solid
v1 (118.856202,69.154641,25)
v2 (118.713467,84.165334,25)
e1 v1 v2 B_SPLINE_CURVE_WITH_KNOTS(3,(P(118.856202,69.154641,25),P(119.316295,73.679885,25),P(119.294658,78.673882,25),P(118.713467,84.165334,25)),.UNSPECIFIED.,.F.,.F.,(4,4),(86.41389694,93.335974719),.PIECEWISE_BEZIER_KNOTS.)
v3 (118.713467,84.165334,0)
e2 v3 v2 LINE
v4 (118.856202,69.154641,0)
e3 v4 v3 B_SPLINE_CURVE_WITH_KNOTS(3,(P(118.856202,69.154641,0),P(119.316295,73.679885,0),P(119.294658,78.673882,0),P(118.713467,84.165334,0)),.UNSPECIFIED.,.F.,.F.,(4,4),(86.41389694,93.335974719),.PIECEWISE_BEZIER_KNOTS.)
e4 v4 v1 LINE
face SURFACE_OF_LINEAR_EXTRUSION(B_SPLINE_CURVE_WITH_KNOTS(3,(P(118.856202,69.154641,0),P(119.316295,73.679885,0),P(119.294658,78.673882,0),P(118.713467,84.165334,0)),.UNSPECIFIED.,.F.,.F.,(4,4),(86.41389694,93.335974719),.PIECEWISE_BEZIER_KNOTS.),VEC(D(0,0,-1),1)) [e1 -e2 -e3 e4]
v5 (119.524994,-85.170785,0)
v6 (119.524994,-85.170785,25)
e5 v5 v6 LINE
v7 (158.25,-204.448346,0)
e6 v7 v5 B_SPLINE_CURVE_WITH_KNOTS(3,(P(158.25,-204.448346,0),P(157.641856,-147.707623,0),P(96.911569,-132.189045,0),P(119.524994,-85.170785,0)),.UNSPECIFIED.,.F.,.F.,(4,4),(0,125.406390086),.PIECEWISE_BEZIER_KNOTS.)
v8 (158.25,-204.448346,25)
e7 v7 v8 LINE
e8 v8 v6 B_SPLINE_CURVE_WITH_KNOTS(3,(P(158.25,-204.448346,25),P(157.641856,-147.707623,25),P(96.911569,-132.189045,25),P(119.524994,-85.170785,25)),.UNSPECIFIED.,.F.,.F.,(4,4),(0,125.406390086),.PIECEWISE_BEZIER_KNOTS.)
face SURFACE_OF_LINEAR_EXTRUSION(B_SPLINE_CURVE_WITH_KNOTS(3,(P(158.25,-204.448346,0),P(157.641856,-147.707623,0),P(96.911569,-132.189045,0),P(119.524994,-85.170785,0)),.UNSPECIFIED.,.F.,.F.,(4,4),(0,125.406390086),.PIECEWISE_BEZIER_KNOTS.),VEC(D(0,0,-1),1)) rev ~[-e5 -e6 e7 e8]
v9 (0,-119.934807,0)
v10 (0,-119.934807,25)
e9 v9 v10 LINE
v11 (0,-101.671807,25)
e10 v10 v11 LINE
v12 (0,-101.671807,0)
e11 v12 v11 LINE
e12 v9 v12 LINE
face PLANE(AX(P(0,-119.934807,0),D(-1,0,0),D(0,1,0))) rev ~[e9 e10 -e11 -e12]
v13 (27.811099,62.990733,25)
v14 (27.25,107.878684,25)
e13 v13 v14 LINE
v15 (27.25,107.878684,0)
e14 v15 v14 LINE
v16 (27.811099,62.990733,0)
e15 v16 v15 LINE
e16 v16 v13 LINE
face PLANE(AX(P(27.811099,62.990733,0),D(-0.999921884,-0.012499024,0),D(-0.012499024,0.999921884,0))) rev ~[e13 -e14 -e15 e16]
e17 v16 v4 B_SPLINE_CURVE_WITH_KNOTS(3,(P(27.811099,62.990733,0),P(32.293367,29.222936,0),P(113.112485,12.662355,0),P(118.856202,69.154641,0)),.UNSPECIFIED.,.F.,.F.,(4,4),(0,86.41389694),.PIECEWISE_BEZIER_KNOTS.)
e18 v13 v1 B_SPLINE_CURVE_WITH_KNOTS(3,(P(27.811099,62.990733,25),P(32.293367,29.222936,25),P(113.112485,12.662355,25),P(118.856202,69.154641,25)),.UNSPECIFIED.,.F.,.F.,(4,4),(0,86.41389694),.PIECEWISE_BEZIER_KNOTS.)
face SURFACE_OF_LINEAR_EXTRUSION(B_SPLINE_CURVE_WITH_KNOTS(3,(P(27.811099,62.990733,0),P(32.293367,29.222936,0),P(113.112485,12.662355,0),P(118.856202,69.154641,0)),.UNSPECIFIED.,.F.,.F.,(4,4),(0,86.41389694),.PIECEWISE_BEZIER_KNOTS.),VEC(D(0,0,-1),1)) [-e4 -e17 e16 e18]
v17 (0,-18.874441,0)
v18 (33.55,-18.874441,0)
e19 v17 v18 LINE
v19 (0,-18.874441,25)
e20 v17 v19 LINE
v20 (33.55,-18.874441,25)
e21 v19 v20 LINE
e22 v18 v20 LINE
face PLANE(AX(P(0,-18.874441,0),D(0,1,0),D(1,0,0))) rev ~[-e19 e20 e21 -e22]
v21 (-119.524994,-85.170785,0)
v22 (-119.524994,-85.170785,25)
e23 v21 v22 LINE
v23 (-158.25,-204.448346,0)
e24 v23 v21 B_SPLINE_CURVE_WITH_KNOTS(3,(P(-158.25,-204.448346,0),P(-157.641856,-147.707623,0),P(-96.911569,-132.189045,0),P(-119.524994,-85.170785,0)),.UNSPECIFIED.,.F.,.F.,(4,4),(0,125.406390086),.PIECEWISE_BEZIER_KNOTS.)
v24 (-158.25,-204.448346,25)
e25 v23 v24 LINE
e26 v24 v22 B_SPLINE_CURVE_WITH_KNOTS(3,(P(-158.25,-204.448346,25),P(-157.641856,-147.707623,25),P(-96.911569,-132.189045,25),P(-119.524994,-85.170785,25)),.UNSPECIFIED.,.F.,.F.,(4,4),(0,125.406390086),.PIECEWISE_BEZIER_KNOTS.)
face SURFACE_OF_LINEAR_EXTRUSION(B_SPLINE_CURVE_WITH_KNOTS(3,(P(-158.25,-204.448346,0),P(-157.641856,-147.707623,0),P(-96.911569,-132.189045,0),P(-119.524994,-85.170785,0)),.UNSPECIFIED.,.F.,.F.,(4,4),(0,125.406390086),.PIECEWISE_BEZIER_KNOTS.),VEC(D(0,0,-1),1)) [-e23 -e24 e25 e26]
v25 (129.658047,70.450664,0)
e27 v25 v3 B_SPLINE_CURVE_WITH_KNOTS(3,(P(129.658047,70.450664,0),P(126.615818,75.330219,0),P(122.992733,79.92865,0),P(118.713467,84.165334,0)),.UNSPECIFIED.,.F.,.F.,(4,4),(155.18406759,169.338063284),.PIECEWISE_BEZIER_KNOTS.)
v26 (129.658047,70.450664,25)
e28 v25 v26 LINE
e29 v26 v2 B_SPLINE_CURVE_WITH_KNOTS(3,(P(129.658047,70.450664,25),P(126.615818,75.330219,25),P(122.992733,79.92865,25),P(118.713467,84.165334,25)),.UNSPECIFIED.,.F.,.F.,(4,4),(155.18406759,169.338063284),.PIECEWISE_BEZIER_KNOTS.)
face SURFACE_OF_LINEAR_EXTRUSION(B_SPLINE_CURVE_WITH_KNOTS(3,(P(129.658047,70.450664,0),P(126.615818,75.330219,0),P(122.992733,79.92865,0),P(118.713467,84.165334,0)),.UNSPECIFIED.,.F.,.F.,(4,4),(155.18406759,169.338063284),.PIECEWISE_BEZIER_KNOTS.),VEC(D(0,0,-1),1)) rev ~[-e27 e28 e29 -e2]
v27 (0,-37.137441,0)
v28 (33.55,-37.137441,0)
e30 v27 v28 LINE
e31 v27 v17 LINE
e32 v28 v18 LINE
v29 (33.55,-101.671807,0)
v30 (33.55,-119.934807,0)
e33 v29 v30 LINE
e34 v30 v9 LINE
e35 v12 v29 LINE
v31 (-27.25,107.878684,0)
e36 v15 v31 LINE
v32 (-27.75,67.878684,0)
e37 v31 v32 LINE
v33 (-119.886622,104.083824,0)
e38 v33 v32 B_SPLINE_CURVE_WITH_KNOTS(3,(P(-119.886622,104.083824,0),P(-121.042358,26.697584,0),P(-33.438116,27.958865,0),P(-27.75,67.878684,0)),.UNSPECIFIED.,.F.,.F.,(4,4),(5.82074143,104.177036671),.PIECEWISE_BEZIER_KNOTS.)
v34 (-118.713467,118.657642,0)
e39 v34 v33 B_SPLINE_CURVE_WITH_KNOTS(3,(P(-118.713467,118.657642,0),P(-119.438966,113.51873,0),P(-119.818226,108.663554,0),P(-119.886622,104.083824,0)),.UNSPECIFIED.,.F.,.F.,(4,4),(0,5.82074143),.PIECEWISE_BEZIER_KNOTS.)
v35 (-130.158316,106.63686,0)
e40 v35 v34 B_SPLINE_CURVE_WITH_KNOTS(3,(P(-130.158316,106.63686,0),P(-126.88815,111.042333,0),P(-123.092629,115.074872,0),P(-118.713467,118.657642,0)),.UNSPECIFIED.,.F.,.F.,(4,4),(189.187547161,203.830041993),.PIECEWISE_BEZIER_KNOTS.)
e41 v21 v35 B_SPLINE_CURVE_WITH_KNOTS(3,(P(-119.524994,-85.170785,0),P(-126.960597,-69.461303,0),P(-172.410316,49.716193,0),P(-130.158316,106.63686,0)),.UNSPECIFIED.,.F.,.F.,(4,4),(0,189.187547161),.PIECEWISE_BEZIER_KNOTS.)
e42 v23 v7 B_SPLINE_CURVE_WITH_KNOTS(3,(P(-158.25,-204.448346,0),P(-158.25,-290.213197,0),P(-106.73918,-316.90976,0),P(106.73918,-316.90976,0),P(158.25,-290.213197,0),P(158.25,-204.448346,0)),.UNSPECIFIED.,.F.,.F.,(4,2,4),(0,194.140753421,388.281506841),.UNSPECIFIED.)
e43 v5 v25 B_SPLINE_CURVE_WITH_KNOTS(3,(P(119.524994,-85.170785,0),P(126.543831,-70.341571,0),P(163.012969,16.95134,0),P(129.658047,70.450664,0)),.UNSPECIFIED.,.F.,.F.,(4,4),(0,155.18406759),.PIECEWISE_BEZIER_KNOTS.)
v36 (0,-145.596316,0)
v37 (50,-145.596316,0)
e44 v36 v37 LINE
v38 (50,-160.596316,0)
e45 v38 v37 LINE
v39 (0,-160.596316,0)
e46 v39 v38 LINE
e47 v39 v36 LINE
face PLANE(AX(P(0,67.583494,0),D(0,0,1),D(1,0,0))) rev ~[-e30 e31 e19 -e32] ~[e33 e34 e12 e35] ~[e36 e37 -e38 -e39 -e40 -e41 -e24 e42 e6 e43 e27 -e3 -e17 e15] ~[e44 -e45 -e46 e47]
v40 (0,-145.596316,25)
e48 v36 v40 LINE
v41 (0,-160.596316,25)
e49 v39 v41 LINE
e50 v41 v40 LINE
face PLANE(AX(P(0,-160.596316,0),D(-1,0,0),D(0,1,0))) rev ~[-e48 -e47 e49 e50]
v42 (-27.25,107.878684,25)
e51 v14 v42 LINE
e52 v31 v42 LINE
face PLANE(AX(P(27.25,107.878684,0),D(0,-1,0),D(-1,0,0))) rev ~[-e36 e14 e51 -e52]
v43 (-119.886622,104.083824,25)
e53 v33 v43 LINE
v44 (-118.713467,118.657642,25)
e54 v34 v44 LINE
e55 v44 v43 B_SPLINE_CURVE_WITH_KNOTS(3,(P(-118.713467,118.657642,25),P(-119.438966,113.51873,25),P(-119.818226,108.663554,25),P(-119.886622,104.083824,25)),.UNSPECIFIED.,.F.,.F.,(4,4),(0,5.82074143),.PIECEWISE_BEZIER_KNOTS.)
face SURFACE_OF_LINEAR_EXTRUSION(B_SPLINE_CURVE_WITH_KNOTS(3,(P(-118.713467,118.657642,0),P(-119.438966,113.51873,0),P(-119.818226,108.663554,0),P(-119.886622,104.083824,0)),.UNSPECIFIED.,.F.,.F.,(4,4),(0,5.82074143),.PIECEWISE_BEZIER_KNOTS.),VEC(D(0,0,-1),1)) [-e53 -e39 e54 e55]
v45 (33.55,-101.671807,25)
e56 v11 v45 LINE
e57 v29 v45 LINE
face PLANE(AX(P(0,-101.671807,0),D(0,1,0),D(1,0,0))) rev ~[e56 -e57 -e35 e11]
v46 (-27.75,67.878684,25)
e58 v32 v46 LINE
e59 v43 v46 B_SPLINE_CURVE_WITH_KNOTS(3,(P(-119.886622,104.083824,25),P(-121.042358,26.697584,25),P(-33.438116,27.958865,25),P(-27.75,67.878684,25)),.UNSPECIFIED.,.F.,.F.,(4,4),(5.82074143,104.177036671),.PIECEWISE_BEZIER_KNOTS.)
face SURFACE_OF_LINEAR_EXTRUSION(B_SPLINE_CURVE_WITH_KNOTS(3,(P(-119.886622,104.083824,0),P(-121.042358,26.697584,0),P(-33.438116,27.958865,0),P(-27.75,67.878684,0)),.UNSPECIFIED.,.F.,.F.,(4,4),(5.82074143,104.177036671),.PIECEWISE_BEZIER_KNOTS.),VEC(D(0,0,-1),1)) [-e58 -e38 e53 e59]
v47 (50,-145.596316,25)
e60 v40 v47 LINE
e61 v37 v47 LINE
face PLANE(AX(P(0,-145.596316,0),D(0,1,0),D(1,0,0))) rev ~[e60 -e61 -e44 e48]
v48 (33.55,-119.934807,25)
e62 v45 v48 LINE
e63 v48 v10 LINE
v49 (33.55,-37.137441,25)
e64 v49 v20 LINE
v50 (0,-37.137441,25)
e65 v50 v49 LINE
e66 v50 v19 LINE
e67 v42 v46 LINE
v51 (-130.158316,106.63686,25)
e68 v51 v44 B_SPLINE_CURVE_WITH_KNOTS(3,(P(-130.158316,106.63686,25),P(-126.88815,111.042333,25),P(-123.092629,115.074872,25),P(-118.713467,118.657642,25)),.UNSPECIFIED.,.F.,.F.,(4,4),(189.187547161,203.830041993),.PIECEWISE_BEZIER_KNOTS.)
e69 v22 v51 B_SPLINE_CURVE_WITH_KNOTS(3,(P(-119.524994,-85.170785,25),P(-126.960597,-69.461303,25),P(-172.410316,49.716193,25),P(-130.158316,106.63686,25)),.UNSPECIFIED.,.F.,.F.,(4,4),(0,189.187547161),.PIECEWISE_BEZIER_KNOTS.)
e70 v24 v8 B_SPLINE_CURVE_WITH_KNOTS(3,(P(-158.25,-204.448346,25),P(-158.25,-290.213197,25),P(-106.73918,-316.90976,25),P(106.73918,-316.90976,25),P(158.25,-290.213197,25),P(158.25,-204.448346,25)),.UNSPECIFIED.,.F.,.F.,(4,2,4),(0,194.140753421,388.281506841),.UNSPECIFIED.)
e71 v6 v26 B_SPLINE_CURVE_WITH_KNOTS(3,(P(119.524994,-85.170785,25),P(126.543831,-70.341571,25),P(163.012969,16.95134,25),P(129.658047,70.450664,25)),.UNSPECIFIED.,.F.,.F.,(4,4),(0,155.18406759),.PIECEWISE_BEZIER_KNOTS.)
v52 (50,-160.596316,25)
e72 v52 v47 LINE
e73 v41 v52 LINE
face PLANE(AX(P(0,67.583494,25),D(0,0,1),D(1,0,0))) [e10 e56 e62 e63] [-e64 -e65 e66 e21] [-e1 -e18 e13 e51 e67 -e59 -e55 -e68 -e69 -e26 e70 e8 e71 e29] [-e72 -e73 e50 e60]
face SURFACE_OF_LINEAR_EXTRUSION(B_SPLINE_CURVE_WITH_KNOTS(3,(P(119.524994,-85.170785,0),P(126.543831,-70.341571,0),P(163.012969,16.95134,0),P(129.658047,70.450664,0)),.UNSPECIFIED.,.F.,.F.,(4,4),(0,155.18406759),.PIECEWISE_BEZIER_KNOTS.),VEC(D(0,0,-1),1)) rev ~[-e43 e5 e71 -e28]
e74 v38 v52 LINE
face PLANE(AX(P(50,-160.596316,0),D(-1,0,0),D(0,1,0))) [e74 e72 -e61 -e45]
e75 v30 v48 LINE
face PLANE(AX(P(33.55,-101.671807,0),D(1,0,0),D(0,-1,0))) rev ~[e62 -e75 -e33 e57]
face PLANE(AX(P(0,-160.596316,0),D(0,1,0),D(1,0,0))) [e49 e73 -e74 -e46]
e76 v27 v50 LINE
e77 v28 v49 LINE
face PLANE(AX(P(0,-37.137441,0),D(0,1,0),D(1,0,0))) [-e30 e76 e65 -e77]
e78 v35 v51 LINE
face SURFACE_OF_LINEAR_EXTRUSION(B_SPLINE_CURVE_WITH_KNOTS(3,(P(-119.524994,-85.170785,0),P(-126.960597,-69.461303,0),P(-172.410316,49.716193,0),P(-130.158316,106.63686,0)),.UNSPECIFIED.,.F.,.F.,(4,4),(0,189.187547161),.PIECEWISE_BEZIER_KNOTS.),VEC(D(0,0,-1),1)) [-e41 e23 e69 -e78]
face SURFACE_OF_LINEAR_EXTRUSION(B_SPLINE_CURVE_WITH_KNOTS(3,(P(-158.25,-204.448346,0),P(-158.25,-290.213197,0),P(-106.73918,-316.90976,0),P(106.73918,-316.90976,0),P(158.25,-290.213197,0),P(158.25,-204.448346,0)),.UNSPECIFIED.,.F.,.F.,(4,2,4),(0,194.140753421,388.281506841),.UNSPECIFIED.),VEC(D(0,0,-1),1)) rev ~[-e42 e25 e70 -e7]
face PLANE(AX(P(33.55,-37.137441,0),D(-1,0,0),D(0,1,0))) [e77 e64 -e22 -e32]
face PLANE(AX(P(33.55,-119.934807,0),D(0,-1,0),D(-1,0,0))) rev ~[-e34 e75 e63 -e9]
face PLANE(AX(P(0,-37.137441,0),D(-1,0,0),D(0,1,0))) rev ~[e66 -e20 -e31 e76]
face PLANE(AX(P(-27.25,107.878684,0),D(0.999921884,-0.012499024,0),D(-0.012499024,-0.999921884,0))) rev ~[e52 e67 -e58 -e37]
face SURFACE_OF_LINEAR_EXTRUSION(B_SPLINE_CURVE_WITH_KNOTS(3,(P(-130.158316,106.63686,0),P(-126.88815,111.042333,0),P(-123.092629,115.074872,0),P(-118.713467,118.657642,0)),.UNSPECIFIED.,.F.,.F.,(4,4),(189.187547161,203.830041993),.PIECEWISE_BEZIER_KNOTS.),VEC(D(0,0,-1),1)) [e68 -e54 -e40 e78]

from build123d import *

# Parameters (mm, degrees)
F0_W     = 50
F0_H     = 15
F0_W_2   = 33.55
F0_H_2   = 18.263
F1_DEPTH = 25


# Not quite as in the source:
# - a feature names something its author has since deleted; it is built from what else it names


with BuildPart() as f1:
    # F0 (on Top) → F1 (new body)
    with BuildSketch(Plane.XY):
        Polygon((27.25, 107.8786835152), (-27.25, 107.8786835152), (-27.75, 67.8786835152), (-28.0282922993, 45.6152995713), (-28.25, 27.8786835152), (28.25, 27.8786835152), (28.0907844192, 40.6159299829), (27.8110993763, 62.99073341), align=None)
        with BuildLine():
            Line((-28.0282922993, 45.6152995713), (-27.75, 67.8786835152))
            add(Edge.make_bspline(
                [(-119.8866222784, 104.0838235955), (-121.0423578492, 26.6975843315), (-33.4381163475, 27.9588649836), (-27.75, 67.8786835152)],
                knots=[5.8207414298, 5.8207414298, 5.8207414298, 5.8207414298, 104.177036671, 104.177036671, 104.177036671, 104.177036671], degree=3))
            add(Edge.make_bspline(
                [(-129.4312865498, 88.9177944447), (-128.9681788838, 89.9439533029), (-126.7042715733, 94.6909513961), (-123.5656981618, 99.854792643), (-120.3833088728, 103.5358856243), (-119.8866222778, 104.0838235953)],
                knots=[174.7937382561, 174.7937382561, 174.7937382561, 174.7937382561, 178.1663413599, 190.5368056939, 192.7537167942, 192.7537167942, 192.7537167942, 192.7537167942], degree=3))
            add(Edge.make_bspline(
                [(-129.4312865498, 88.9177944447), (-129.3109849454, 88.0758069), (-128.4336564101, 82.4912333506), (-125.9636072037, 72.6752311218), (-120.2024501307, 60.4880102216), (-112.6215186167, 50.3680139367), (-103.6339611104, 42.3905323107), (-93.696674412, 36.532063254), (-83.2179047221, 32.6896328601), (-72.5392583415, 30.7367375732), (-61.9410573447, 30.5552142432), (-51.6845955009, 32.0994665415), (-42.5038344938, 35.1003258688), (-35.1676094551, 39.272763754), (-30.7048923289, 42.9689824885), (-28.563789449, 45.0637979027), (-28.0282922993, 45.6152995713)],
                knots=[31.2550682463, 31.2550682463, 31.2550682463, 31.2550682463, 33.8015913522, 48.177750167, 61.4744919422, 73.96612477, 85.8554939797, 97.2898755487, 108.3722273852, 119.1669646926, 129.7095146782, 140.0247340346, 150.1520713556, 158.5067230901, 165.1780752822, 167.4830132535, 167.4830132535, 167.4830132535, 167.4830132535], degree=3))
        make_face()
        with BuildLine():
            add(Edge.make_bspline(
                [(27.8110993763, 62.99073341), (32.2933669496, 29.2229355953), (113.1124852102, 12.6623549852), (118.8562015646, 69.1546411271)],
                knots=[0, 0, 0, 0, 86.4138969398, 86.4138969398, 86.4138969398, 86.4138969398], degree=3))
            Line((27.8110993763, 62.99073341), (28.0907844192, 40.6159299829))
            add(Edge.make_bspline(
                [(28.0907844192, 40.6159299829), (29.287798378, 39.3429032121), (32.9148444473, 35.925399713), (39.7570190189, 31.2557479048), (48.6151552623, 26.9252261046), (58.1307163688, 23.8031969869), (68.0898843108, 21.9265931964), (78.3013198669, 21.4068174609), (88.5616997912, 22.40383688), (98.6335430856, 25.1427600429), (108.1809690997, 29.9014168198), (116.6857490885, 36.9285745162), (122.9775786719, 45.5470774874), (125.7269242874, 51.946079615), (126.7237292348, 54.9306006364)],
                knots=[23.8574779363, 23.8574779363, 23.8574779363, 23.8574779363, 29.0928113686, 38.7540016942, 48.5866257781, 58.5851158791, 68.7062096676, 78.9034224293, 89.1584624493, 99.5062924883, 110.045747029, 120.9208868969, 132.2887869108, 141.7007014746, 141.7007014746, 141.7007014746, 141.7007014746], degree=3))
            add(Edge.make_bspline(
                [(126.7237292348, 54.9306006364), (126.1874967207, 56.2317474218), (124.1003720443, 60.9435117835), (121.4166682373, 65.6994419315), (119.0247712369, 68.9308388277), (118.8562015646, 69.1546411271)],
                knots=[140.16898266, 140.16898266, 140.16898266, 140.16898266, 144.3874002602, 155.6048910041, 156.4452003175, 156.4452003175, 156.4452003175, 156.4452003175], degree=3))
        make_face()
        with BuildLine():
            Line((-28.25, 27.8786835152), (-28.0282922993, 45.6152995713))
            add(Edge.make_bspline(
                [(-129.4312865498, 88.9177944447), (-129.3109849454, 88.0758069), (-128.4336564101, 82.4912333506), (-125.9636072037, 72.6752311218), (-120.2024501307, 60.4880102216), (-112.6215186167, 50.3680139367), (-103.6339611104, 42.3905323107), (-93.696674412, 36.532063254), (-83.2179047221, 32.6896328601), (-72.5392583415, 30.7367375732), (-61.9410573447, 30.5552142432), (-51.6845955009, 32.0994665415), (-42.5038344938, 35.1003258688), (-35.1676094551, 39.272763754), (-30.7048923289, 42.9689824885), (-28.563789449, 45.0637979027), (-28.0282922993, 45.6152995713)],
                knots=[31.2550682463, 31.2550682463, 31.2550682463, 31.2550682463, 33.8015913522, 48.177750167, 61.4744919422, 73.96612477, 85.8554939797, 97.2898755487, 108.3722273852, 119.1669646926, 129.7095146782, 140.0247340346, 150.1520713556, 158.5067230901, 165.1780752822, 167.4830132535, 167.4830132535, 167.4830132535, 167.4830132535], degree=3))
            add(Edge.make_bspline(
                [(-130.1583163956, 106.6368603294), (-130.2482463228, 105.1422313843), (-130.4708327377, 99.2283714352), (-130.0575927336, 93.3012938045), (-129.4312865498, 88.9177944447)],
                knots=[13.5070543021, 13.5070543021, 13.5070543021, 13.5070543021, 17.9975296122, 31.2550682463, 31.2550682463, 31.2550682463, 31.2550682463], degree=3))
            add(Edge.make_bspline(
                [(-119.5249942189, -85.1707845054), (-126.9605969931, -69.461302998), (-172.4103162726, 49.7161929114), (-130.1583163912, 106.6368603279)],
                knots=[0, 0, 0, 0, 189.1875471614, 189.1875471614, 189.1875471614, 189.1875471614], degree=3))
            add(Edge.make_bspline(
                [(-158.25, -204.448345688), (-157.6418556412, -147.7076234473), (-96.9115691033, -132.1890450103), (-119.5249942189, -85.1707845054)],
                knots=[0, 0, 0, 0, 125.406390086, 125.406390086, 125.406390086, 125.406390086], degree=3))
            add(Edge.make_bspline(
                [(-158.25, -204.448345688), (-158.25, -290.2131974697), (-106.7391799071, -316.9097596875), (0, -316.9097596875)],
                knots=[0, 0, 0, 0, 194.1407534207, 194.1407534207, 194.1407534207, 194.1407534207], degree=3))
            add(Edge.make_bspline(
                [(158.25, -204.448345688), (158.25, -290.2131974697), (106.7391799071, -316.9097596875), (0, -316.9097596875)],
                knots=[0, 0, 0, 0, 194.1407534207, 194.1407534207, 194.1407534207, 194.1407534207], degree=3))
            add(Edge.make_bspline(
                [(158.25, -204.448345688), (157.6418556412, -147.7076234473), (96.9115691033, -132.1890450103), (119.5249942189, -85.1707845054)],
                knots=[0, 0, 0, 0, 125.406390086, 125.406390086, 125.406390086, 125.406390086], degree=3))
            add(Edge.make_bspline(
                [(119.5249942189, -85.1707845054), (126.5438310067, -70.3415708106), (163.0129687478, 16.9513401574), (129.6580469223, 70.4506637657)],
                knots=[0, 0, 0, 0, 155.1840675903, 155.1840675903, 155.1840675903, 155.1840675903], degree=3))
            add(Edge.make_bspline(
                [(126.7237292348, 54.9306006364), (127.0043283083, 55.7707387556), (128.5538224017, 60.8007183147), (129.4403792123, 66.0439240135), (129.6568620638, 70.4263535727), (129.6580469223, 70.4506637657)],
                knots=[141.7007014746, 141.7007014746, 141.7007014746, 141.7007014746, 144.3501410806, 157.4352190661, 157.5082077989, 157.5082077989, 157.5082077989, 157.5082077989], degree=3))
            add(Edge.make_bspline(
                [(28.0907844192, 40.6159299829), (29.287798378, 39.3429032121), (32.9148444473, 35.925399713), (39.7570190189, 31.2557479048), (48.6151552623, 26.9252261046), (58.1307163688, 23.8031969869), (68.0898843108, 21.9265931964), (78.3013198669, 21.4068174609), (88.5616997912, 22.40383688), (98.6335430856, 25.1427600429), (108.1809690997, 29.9014168198), (116.6857490885, 36.9285745162), (122.9775786719, 45.5470774874), (125.7269242874, 51.946079615), (126.7237292348, 54.9306006364)],
                knots=[23.8574779363, 23.8574779363, 23.8574779363, 23.8574779363, 29.0928113686, 38.7540016942, 48.5866257781, 58.5851158791, 68.7062096676, 78.9034224293, 89.1584624493, 99.5062924883, 110.045747029, 120.9208868969, 132.2887869108, 141.7007014746, 141.7007014746, 141.7007014746, 141.7007014746], degree=3))
            Line((28.0907844192, 40.6159299829), (28.25, 27.8786835152))
            Line((28.25, 27.8786835152), (-28.25, 27.8786835152))
        make_face()
        with Locations((25, -153.0963164848)):
            Rectangle(F0_W, F0_H, mode=Mode.SUBTRACT)
        Polygon((0, -119.9348074679), (0, -101.6718074679), (27.3104757071, -101.6718074679), (33.55, -101.6718074679), (33.55, -119.9348074679), align=None, mode=Mode.SUBTRACT)
        with Locations((16.775, -28.0059413371)):
            Rectangle(F0_W_2, F0_H_2, mode=Mode.SUBTRACT)
        with BuildLine():
            add(Edge.make_bspline(
                [(-129.4312865498, 88.9177944447), (-128.9681788838, 89.9439533029), (-126.7042715733, 94.6909513961), (-123.5656981618, 99.854792643), (-120.3833088728, 103.5358856243), (-119.8866222778, 104.0838235953)],
                knots=[174.7937382561, 174.7937382561, 174.7937382561, 174.7937382561, 178.1663413599, 190.5368056939, 192.7537167942, 192.7537167942, 192.7537167942, 192.7537167942], degree=3))
            add(Edge.make_bspline(
                [(-118.7134671008, 118.6576419779), (-119.4389657293, 113.5187304004), (-119.8182256607, 108.6635537275), (-119.8866222784, 104.0838235955)],
                knots=[0, 0, 0, 0, 5.8207414298, 5.8207414298, 5.8207414298, 5.8207414298], degree=3))
            add(Edge.make_bspline(
                [(-130.1583163912, 106.6368603279), (-126.888150362, 111.0423330505), (-123.0926289669, 115.0748717049), (-118.7134671008, 118.6576419779)],
                knots=[189.1875471614, 189.1875471614, 189.1875471614, 189.1875471614, 203.8300419931, 203.8300419931, 203.8300419931, 203.8300419931], degree=3))
            add(Edge.make_bspline(
                [(-130.1583163956, 106.6368603294), (-130.2482463228, 105.1422313843), (-130.4708327377, 99.2283714352), (-130.0575927336, 93.3012938045), (-129.4312865498, 88.9177944447)],
                knots=[13.5070543021, 13.5070543021, 13.5070543021, 13.5070543021, 17.9975296122, 31.2550682463, 31.2550682463, 31.2550682463, 31.2550682463], degree=3))
        make_face()
        with BuildLine():
            add(Edge.make_bspline(
                [(118.8562015646, 69.1546411271), (119.3162948222, 73.679885474), (119.2946583668, 78.6738817109), (118.7134671008, 84.1653342065)],
                knots=[86.4138969398, 86.4138969398, 86.4138969398, 86.4138969398, 93.3359747193, 93.3359747193, 93.3359747193, 93.3359747193], degree=3))
            add(Edge.make_bspline(
                [(126.7237292348, 54.9306006364), (126.1874967207, 56.2317474218), (124.1003720443, 60.9435117835), (121.4166682373, 65.6994419315), (119.0247712369, 68.9308388277), (118.8562015646, 69.1546411271)],
                knots=[140.16898266, 140.16898266, 140.16898266, 140.16898266, 144.3874002602, 155.6048910041, 156.4452003175, 156.4452003175, 156.4452003175, 156.4452003175], degree=3))
            add(Edge.make_bspline(
                [(126.7237292348, 54.9306006364), (127.0043283083, 55.7707387556), (128.5538224017, 60.8007183147), (129.4403792123, 66.0439240135), (129.6568620638, 70.4263535727), (129.6580469223, 70.4506637657)],
                knots=[141.7007014746, 141.7007014746, 141.7007014746, 141.7007014746, 144.3501410806, 157.4352190661, 157.5082077989, 157.5082077989, 157.5082077989, 157.5082077989], degree=3))
            add(Edge.make_bspline(
                [(129.6580469223, 70.4506637657), (126.6158182503, 75.3302187852), (122.992732948, 79.9286496563), (118.7134671008, 84.1653342065)],
                knots=[155.1840675903, 155.1840675903, 155.1840675903, 155.1840675903, 169.3380632837, 169.3380632837, 169.3380632837, 169.3380632837], degree=3))
        make_face()
    extrude(amount=F1_DEPTH)


solid = f1.part
